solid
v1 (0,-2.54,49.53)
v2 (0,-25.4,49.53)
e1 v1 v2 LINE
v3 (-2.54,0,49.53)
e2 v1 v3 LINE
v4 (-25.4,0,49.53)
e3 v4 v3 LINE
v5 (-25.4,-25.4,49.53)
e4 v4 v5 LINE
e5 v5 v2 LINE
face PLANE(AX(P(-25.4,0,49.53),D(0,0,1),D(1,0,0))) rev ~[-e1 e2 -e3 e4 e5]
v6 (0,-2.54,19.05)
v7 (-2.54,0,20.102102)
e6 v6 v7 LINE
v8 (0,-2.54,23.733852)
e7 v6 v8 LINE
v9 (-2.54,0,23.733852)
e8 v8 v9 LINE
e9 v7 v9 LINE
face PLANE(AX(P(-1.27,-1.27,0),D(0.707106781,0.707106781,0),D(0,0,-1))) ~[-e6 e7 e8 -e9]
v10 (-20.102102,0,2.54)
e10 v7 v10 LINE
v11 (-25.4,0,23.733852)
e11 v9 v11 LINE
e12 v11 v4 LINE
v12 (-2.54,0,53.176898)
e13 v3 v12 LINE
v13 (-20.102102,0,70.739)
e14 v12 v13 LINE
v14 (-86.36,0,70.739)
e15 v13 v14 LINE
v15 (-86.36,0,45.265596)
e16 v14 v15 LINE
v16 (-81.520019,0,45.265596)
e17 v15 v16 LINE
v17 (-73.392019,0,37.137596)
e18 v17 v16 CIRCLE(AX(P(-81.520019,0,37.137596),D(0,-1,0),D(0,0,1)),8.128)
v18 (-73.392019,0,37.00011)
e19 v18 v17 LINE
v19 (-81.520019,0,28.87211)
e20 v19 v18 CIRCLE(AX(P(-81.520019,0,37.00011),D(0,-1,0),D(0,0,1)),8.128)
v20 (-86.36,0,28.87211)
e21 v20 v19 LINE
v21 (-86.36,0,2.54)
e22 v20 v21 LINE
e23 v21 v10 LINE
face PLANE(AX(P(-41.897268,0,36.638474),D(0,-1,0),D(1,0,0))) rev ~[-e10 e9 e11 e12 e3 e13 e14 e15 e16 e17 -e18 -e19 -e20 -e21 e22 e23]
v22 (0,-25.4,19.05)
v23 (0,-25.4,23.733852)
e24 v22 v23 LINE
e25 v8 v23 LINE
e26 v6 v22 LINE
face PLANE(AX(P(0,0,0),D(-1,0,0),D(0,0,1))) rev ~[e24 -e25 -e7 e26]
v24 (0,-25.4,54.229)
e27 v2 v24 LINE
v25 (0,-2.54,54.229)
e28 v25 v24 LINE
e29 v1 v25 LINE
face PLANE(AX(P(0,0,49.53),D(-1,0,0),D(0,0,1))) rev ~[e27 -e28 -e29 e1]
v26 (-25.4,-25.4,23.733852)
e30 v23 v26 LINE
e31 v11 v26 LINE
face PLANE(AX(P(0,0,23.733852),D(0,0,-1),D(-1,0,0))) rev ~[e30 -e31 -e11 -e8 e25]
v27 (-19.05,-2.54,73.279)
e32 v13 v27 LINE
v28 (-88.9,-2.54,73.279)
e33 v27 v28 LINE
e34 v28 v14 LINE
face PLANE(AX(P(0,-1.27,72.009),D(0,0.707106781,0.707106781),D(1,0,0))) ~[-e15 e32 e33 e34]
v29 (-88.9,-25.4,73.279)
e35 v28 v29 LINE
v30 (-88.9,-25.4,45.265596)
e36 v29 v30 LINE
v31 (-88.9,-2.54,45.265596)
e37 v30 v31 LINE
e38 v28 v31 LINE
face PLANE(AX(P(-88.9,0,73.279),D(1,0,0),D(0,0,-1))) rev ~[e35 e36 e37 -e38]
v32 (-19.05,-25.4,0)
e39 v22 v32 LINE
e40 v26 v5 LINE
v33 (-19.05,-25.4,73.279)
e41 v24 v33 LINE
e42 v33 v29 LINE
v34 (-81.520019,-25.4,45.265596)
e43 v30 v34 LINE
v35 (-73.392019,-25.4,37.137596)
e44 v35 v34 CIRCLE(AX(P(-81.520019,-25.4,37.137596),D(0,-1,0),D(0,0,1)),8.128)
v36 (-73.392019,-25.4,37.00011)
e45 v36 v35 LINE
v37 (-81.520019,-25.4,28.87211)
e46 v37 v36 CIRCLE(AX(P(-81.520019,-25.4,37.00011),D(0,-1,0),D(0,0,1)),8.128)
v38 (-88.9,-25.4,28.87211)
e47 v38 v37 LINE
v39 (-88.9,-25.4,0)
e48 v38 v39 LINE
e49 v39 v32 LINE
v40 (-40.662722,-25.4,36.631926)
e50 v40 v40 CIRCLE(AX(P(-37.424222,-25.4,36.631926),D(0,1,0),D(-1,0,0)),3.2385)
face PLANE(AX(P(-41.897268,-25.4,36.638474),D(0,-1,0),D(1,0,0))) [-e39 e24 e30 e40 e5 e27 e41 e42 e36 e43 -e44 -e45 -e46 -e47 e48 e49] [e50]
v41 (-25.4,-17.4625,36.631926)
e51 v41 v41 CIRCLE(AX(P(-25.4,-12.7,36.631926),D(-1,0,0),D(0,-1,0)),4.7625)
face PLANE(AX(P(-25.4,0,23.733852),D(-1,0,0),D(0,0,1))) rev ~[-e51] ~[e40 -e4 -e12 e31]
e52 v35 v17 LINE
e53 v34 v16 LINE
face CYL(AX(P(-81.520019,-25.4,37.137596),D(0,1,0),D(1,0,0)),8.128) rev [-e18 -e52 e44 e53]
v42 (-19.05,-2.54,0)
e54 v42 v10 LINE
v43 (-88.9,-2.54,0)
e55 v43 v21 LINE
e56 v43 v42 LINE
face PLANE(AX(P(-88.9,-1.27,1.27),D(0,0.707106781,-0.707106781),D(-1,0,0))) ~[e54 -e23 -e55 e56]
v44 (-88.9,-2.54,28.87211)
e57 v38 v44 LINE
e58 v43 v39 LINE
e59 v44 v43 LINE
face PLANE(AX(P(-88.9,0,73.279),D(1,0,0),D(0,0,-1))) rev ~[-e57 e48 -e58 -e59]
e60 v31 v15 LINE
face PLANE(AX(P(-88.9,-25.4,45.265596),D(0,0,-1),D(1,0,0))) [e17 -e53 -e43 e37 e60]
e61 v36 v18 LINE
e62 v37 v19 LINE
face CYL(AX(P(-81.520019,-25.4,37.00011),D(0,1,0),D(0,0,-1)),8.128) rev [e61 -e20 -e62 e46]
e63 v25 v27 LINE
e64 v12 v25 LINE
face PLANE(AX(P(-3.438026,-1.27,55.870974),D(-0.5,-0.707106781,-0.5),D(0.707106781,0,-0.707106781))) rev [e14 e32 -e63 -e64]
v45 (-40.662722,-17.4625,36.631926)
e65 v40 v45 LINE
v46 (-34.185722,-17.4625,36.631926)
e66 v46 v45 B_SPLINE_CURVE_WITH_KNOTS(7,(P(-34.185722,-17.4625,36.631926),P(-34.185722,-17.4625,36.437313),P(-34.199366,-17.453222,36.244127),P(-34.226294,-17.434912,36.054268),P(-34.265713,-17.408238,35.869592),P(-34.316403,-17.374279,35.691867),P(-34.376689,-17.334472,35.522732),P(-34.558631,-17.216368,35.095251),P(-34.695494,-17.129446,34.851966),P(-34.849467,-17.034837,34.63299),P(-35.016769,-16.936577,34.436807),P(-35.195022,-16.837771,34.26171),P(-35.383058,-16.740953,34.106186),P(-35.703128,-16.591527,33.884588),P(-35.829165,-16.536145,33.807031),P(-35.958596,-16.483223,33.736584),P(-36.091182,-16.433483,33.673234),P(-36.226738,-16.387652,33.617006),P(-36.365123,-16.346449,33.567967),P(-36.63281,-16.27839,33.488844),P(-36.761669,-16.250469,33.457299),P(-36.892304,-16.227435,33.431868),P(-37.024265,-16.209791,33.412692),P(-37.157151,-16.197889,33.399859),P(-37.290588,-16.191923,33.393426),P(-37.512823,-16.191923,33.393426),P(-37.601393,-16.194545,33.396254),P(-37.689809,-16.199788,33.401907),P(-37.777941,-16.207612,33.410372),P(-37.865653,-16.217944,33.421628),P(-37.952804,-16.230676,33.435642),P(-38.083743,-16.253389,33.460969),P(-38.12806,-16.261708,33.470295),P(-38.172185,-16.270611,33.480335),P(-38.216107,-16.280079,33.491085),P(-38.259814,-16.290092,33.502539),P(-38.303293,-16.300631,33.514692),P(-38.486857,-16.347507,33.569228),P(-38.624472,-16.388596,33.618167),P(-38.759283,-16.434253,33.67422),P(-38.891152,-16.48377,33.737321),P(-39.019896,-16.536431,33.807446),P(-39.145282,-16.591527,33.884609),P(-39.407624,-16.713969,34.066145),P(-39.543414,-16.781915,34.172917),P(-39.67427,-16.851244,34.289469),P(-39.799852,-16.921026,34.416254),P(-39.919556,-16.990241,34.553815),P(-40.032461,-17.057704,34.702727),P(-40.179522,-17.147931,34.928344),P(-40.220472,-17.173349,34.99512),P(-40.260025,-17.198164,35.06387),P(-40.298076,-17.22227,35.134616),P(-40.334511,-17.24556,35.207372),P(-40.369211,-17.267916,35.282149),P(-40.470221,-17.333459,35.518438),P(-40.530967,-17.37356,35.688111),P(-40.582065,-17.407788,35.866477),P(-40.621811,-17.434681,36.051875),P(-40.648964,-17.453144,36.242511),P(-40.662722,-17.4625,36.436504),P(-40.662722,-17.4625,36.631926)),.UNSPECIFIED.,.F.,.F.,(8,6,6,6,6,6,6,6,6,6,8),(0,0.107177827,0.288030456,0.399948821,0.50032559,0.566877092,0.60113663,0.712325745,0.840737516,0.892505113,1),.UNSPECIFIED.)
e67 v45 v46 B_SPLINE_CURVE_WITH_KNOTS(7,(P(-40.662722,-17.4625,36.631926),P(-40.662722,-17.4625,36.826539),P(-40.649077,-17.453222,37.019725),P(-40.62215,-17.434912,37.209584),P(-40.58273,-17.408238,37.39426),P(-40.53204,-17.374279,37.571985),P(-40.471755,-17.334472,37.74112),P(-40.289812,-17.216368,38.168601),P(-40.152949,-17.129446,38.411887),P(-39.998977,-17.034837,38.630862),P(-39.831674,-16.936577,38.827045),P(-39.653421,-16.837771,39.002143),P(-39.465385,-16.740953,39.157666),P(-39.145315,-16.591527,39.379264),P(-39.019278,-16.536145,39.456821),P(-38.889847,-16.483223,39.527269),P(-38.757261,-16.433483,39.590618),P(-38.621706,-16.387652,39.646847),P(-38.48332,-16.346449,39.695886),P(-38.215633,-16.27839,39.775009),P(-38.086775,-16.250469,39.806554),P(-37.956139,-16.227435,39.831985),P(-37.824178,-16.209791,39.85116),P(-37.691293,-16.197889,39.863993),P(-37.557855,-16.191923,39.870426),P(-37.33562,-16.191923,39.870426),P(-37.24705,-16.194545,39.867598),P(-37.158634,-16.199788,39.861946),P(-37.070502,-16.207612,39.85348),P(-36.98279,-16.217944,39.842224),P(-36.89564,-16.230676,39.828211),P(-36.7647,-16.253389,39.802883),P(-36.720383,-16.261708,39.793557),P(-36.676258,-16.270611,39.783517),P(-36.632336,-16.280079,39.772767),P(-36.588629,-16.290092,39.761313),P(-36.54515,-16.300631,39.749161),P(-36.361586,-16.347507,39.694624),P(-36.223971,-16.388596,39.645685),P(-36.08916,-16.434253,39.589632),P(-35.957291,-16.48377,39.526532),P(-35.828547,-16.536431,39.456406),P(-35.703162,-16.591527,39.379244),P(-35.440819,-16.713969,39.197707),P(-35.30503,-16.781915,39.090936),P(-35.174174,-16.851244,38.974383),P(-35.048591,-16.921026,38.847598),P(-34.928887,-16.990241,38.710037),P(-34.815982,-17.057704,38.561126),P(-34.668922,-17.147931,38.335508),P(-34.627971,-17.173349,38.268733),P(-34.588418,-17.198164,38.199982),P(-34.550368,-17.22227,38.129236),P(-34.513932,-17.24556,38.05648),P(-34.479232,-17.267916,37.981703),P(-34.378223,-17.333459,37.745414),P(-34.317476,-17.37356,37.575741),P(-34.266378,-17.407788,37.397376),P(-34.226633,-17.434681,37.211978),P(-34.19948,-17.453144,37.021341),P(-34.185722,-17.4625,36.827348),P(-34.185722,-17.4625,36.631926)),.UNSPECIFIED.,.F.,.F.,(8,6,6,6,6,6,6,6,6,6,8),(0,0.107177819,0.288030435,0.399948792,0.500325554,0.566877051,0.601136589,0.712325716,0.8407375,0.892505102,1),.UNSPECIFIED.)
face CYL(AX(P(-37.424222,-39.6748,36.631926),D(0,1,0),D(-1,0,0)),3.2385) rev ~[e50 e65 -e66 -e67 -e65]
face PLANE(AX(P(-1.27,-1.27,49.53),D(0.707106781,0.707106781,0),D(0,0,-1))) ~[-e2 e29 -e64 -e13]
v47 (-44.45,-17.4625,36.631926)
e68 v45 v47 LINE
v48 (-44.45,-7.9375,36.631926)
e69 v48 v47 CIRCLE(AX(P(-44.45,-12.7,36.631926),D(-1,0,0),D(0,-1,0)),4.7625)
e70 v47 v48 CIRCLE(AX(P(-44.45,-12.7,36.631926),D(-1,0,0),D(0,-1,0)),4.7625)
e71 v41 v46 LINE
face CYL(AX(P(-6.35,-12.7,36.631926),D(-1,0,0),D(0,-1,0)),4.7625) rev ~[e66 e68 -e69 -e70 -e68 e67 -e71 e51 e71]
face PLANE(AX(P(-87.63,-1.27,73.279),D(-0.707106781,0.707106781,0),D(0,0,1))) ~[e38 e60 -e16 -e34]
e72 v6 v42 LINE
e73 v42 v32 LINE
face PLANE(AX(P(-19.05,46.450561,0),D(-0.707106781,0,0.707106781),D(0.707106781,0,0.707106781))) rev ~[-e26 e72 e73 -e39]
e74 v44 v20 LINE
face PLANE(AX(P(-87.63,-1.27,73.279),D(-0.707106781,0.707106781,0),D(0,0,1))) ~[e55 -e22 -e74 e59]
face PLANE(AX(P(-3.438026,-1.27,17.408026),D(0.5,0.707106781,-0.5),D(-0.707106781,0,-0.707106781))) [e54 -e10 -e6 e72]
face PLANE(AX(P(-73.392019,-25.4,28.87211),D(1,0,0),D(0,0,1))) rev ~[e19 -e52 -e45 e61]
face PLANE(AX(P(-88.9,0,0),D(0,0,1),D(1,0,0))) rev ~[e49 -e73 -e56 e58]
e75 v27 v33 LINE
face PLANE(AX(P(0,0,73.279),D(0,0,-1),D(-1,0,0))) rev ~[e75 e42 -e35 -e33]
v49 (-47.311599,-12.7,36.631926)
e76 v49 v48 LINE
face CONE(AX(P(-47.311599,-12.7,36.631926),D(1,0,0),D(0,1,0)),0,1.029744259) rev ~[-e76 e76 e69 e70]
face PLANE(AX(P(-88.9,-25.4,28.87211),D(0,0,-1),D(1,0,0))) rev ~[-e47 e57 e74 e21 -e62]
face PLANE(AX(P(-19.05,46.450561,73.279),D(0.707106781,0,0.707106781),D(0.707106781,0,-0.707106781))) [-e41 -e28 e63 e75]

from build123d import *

# Parameters (mm, degrees)
F1_DEPTH    = 25.4
F2_SIZE     = 2.54
F3_T1_DEPTH = 120.8411218415
F4_SIZE     = 2.54
F5_W        = 15.5079813242
F5_H        = 16.3934864104
F6_DEPTH    = 25.4
F7_R        = 8.128
F9_D        = 9.525
F9_DEPTH    = 19.05
F9_TIP      = 2.8615986981
F11_D       = 6.477
F11_DEPTH   = 14.2748
F11_TIP     = 1.9458871147


# Not quite as in the source:
# - a fillet or chamfer that OpenCascade refuses, or shapes differently, is made with other operations: its cross-section is extruded or revolved along the edge and cut away or added


with BuildPart() as f1:
    # F0 (on Front) → F1 (new body)
    with BuildSketch(Plane.XZ):
        Polygon((-88.9, 0), (0, 0), (0, 23.7338524312), (-25.4, 23.7338524312), (-25.4, 49.53), (0, 49.53), (0, 73.279), (-88.9, 73.279), align=None)
    extrude(amount=F1_DEPTH)

    # F2
    f2_edges = [f1.edges().sort_by_distance(p)[0] for p in [
        (-44.45, 0, 73.279),
        (0, 0, 61.4045),
        (-88.9, 0, 36.6395),
        (-44.45, 0, 0),
        (0, 0, 11.866926),
    ]]
    chamfer(f2_edges, length=F2_SIZE)

    # F3: chamfer of 19.05 on 2 edges, made by hand

    # F3_s2 → F3_t1 (cut)
    with BuildSketch(Plane.XZ.offset(-46.4505609208)):
        Polygon((-19.05, 73.279), (0, 54.229), (0, 73.279), align=None)
        Polygon((-19.05, 0), (0, 19.05), (0, 0), align=None)
    extrude(amount=F3_T1_DEPTH, mode=Mode.SUBTRACT)

    # F4
    f4_edges = [f1.edges().sort_by_distance(p)[0] for p in [
        (-9.525, 0, 63.754),
        (-9.525, 0, 9.525),
    ]]
    chamfer(f4_edges, length=F4_SIZE)

    # F5 (on face) → F6 (cut)
    with BuildSketch(Plane.XZ.offset(25.4)):
        with Locations((-81.1460093379, 37.0688531548)):
            Rectangle(F5_W, F5_H)
    extrude(amount=-F6_DEPTH, mode=Mode.SUBTRACT)

    # F7
    f7_edges = [f1.edges().sort_by_distance(p)[0] for p in [
        (-73.392019, -12.7, 45.265596),
        (-73.392019, -12.7, 28.87211),
    ]]
    fillet(f7_edges, radius=F7_R)

    # F9
    with Locations(Plane.YZ.offset(-25.4)):
        with Locations((-12.7, 36.6319262156)):
            Hole(F9_D / 2, depth=F9_DEPTH)
            with Locations((0, 0, -(F9_DEPTH + F9_TIP / 2))):  # 118° drill point
                Cone(0, F9_D / 2, F9_TIP, mode=Mode.SUBTRACT)

    # F11
    with Locations(Plane.XZ.offset(25.4)):
        with Locations((-37.4242216349, 36.6319262156)):
            Hole(F11_D / 2, depth=F11_DEPTH)
            with Locations((0, 0, -(F11_DEPTH + F11_TIP / 2))):  # 118° drill point
                Cone(0, F11_D / 2, F11_TIP, mode=Mode.SUBTRACT)


solid = f1.part
